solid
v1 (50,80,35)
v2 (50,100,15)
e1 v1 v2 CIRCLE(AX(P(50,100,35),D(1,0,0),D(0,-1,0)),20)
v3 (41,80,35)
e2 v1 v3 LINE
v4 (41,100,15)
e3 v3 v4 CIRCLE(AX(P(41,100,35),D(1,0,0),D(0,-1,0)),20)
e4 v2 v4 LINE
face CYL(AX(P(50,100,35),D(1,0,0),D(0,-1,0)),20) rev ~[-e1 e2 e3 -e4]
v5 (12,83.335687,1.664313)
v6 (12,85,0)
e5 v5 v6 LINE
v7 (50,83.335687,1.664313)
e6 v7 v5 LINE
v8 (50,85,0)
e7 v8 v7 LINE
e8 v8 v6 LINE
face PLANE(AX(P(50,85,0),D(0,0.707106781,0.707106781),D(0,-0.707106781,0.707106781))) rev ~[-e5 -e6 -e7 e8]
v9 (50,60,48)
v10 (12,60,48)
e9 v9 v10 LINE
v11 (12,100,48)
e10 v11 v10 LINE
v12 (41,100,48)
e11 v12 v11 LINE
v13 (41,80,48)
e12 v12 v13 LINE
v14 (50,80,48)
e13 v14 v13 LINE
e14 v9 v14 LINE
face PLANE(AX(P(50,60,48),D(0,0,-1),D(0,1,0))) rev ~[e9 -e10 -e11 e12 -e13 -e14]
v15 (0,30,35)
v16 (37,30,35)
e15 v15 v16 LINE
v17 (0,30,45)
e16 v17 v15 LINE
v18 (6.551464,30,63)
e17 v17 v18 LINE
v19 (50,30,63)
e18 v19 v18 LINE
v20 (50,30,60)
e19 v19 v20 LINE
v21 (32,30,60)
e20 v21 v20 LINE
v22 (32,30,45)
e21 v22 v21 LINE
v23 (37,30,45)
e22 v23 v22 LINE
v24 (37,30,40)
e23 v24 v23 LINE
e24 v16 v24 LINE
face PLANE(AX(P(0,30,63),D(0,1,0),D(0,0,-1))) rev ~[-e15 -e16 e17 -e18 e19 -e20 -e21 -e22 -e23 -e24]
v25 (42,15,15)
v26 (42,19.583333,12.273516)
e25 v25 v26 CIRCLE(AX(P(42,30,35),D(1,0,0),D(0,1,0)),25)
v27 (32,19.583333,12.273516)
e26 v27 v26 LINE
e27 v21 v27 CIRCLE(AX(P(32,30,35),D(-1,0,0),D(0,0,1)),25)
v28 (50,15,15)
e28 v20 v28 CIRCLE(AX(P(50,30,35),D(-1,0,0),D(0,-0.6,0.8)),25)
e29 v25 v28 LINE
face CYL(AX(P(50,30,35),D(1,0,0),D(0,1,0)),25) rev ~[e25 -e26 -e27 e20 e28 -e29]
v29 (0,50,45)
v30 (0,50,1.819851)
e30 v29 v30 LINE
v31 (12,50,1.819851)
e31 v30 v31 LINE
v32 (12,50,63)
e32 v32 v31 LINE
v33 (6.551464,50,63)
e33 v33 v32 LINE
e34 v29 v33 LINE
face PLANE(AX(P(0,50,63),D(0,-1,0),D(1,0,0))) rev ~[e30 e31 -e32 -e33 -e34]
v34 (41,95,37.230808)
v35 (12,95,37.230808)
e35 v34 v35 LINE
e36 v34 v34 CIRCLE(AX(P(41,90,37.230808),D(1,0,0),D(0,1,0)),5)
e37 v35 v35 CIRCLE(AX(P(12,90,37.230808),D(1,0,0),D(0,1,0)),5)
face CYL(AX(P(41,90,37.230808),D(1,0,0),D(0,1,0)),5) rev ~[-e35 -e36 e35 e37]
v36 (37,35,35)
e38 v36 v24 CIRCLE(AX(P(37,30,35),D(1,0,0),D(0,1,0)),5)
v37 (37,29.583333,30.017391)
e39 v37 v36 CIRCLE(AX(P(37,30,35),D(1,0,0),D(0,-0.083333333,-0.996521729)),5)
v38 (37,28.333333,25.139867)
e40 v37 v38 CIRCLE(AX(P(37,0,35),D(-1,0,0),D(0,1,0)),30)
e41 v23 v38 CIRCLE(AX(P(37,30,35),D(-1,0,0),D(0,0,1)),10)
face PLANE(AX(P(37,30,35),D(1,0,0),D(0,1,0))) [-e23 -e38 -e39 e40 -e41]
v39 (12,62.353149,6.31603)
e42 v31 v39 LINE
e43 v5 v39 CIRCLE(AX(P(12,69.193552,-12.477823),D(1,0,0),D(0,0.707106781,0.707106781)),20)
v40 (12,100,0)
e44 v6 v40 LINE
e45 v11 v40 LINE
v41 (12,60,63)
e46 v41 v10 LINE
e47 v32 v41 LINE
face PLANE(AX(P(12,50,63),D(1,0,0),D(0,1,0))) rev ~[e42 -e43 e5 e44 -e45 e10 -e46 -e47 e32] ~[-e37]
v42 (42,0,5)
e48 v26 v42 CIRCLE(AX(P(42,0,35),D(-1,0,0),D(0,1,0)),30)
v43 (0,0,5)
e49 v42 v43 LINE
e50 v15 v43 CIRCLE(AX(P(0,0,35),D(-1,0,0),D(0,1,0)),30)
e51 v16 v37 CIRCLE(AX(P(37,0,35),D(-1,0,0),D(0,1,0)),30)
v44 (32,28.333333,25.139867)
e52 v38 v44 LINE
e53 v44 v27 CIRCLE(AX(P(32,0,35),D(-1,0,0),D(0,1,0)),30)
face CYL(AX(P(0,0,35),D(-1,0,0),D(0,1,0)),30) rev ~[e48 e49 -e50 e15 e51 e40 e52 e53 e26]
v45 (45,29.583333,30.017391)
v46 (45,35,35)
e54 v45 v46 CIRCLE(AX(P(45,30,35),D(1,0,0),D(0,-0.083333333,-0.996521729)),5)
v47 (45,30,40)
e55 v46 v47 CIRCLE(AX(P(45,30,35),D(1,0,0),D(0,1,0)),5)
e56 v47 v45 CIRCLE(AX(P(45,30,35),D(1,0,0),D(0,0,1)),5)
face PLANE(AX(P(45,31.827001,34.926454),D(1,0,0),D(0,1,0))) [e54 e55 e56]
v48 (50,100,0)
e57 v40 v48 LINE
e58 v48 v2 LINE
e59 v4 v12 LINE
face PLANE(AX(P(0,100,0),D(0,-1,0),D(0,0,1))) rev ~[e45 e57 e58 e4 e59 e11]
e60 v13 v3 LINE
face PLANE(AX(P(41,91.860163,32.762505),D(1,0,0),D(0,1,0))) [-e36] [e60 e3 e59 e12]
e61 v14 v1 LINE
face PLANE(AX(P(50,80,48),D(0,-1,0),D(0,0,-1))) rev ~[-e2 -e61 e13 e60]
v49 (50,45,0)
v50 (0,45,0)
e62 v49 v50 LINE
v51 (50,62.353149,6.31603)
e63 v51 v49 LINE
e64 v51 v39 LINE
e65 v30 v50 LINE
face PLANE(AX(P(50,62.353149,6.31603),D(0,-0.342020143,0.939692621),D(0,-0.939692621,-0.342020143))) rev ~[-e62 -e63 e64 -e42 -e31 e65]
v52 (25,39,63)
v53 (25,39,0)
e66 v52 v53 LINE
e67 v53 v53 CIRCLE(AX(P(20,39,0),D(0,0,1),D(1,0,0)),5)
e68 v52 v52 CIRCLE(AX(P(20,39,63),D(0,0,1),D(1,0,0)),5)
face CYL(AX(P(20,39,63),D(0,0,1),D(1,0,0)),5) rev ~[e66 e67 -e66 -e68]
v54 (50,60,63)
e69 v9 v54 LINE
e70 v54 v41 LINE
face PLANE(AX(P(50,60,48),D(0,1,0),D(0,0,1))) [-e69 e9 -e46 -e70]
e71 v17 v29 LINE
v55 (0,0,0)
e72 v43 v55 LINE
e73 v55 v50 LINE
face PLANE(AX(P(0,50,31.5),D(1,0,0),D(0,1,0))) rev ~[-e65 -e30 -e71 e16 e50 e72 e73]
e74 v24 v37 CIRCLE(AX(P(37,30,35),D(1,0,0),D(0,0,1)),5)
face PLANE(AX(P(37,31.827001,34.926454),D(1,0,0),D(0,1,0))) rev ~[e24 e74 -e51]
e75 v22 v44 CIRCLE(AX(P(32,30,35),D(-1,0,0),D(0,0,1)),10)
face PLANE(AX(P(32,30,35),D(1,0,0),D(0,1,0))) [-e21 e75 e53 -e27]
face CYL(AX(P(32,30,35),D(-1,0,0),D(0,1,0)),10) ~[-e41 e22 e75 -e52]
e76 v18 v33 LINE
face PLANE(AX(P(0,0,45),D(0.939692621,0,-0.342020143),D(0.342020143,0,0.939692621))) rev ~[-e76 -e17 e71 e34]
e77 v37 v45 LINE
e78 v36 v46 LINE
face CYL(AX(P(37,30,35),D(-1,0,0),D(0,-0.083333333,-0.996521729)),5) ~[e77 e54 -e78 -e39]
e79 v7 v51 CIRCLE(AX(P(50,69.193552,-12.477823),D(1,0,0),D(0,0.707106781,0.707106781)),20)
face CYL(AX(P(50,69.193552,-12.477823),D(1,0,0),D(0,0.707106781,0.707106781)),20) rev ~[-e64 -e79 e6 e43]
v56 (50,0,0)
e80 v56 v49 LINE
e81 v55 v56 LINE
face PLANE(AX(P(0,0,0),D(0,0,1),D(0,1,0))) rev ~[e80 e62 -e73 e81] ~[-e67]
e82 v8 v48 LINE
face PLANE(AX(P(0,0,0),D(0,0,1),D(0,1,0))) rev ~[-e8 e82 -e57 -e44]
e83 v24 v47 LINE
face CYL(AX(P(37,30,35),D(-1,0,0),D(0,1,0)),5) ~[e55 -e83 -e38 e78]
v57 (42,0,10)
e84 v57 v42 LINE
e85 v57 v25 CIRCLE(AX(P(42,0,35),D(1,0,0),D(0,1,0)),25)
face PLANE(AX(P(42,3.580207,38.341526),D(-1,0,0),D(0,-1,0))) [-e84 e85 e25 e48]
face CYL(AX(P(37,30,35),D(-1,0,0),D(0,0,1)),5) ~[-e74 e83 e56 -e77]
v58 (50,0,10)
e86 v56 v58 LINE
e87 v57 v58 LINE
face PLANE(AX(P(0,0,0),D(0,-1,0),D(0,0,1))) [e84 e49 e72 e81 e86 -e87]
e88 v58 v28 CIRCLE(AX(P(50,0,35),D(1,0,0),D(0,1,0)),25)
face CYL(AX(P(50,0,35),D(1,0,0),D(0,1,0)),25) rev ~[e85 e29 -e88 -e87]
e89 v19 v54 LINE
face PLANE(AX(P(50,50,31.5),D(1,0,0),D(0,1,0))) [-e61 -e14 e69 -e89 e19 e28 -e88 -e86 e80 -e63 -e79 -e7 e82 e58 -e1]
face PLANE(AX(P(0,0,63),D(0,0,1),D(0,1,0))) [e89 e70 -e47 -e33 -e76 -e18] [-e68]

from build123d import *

# Parameters (mm, degrees)
F0_W      = 100
F0_H      = 63
F1_DEPTH  = 50
F3_DEPTH  = 50.001
F4_W      = 40
F4_H      = 15
F5_DEPTH  = 50.001
F7_DEPTH  = 9
F8_R      = 5
F9_DEPTH  = 41.001
F10_W     = 12
F10_H     = 10
F10_H_2   = 40
F11_DEPTH = 63.001
F13_DEPTH = 187
F15_DEPTH = 100.001
F16_R     = 25
F17_DEPTH = 18
F18_R     = 10
F19_DEPTH = 5
F22_DEPTH = 42
F20_R     = 25
F23_DEPTH = 8
F25_DEPTH = 8
F26_W     = 40
F26_H     = 9
F27_DEPTH = 8.001
F28_R     = 5
F29_DEPTH = 63.001


# Not quite as in the source:
# - an extrude ends at something that could not be found from the text; its depth is read off the source's solid


with BuildPart() as f1:
    # F0 (on Right) → F1 (new body)
    with BuildSketch(Plane.YZ):
        with Locations((50, 31.5)):
            Rectangle(F0_W, F0_H)
    extrude(amount=F1_DEPTH)

    # F2 (on face) → F3 (cut, through all)
    with BuildSketch(Plane.YZ.offset(50)):
        with BuildLine():
            Line((62.353148703, 6.3160295987), (45, 0))
            Line((45, 0), (85, 0))
            Line((85, 0), (83.3356871933, 1.6643128067))
            ThreePointArc((83.3356871933, 1.6643128067), (73.5223438483, 7.0480973254), (62.353148703, 6.3160295987))
        make_face()
    extrude(amount=-F3_DEPTH, mode=Mode.SUBTRACT)

    # F4 (on face) → F5 (cut, through all)
    with BuildSketch(Plane.YZ.offset(50)):
        with Locations((80, 55.5)):
            Rectangle(F4_W, F4_H)
    extrude(amount=-F5_DEPTH, mode=Mode.SUBTRACT)

    # F6 (on face) → F7 (cut)
    with BuildSketch(Plane.YZ.offset(50)):
        with BuildLine():
            ThreePointArc((84.8013158464, 48), (81.2386876382, 41.9291527956), (80, 35))
            ThreePointArc((80, 35), (85.8578643763, 20.8578643763), (100, 15))
            Line((100, 15), (100, 48))
            Line((100, 48), (84.8013158464, 48))
        make_face()
        with BuildLine():
            Line((80, 48), (80, 35))
            ThreePointArc((80, 35), (81.2386876382, 41.9291527956), (84.8013158464, 48))
            Line((84.8013158464, 48), (80, 48))
        make_face()
    extrude(amount=-F7_DEPTH, mode=Mode.SUBTRACT)

    # F8 (on face) → F9 (cut, through all)
    with BuildSketch(Plane.YZ.offset(41)):
        with Locations((90, 37.2308082879)):
            Circle(F8_R)
    extrude(amount=-F9_DEPTH, mode=Mode.SUBTRACT)

    # F10 (on face) → F11 (cut, through all)
    with BuildSketch(Plane.XY.offset(63)):
        with Locations((6, 55)):
            Rectangle(F10_W, F10_H)
        with Locations((6, 80)):
            Rectangle(F10_W, F10_H_2)
    extrude(amount=-F11_DEPTH, mode=Mode.SUBTRACT)

    # F12 (on face) → F13 (cut, through all)
    with BuildSketch(Plane.XZ):
        Polygon((0, 63), (0, 45), (6.5514642168, 63), align=None)
    extrude(amount=F13_DEPTH, mode=Mode.SUBTRACT)

    # F14 (on face) → F15 (cut, through all)
    with BuildSketch(Plane.XZ):
        Polygon((0, 63), (0, 45), (6.5514642168, 63), align=None)
    extrude(amount=-F15_DEPTH, mode=Mode.SUBTRACT)

    # F16 (on face) → F17 (cut)
    with BuildSketch(Plane.YZ.offset(50)):
        with Locations((30, 35)):
            Circle(F16_R)
    extrude(amount=-F17_DEPTH, mode=Mode.SUBTRACT)

    # F18 (on face) → F19 (join)
    with BuildSketch(Plane.YZ.offset(32)):
        with Locations((30, 35)):
            Circle(F18_R)
    extrude(amount=F19_DEPTH)

    # F21 (on face) → F22 (cut)
    with BuildSketch(Plane(origin=(0, 0, 0), x_dir=(0, -1, 0), z_dir=(-1, 0, 0))):
        with BuildLine():
            Line((-30, 63), (-30, 35))
            ThreePointArc((-30, 35), (21.9316580473, 14.5304524892), (-2.0665083135, 64.9287410926))
            Line((-2.0665083135, 64.9287410926), (-30, 63))
        make_face()
    extrude(amount=-F22_DEPTH, mode=Mode.SUBTRACT)

    # F20 (on face) → F23 (cut)
    with BuildSketch(Plane.YZ.offset(50)):
        with Locations((0, 35)):
            Circle(F20_R)
    extrude(amount=-F23_DEPTH, mode=Mode.SUBTRACT)

    # F24 (on face) → F25 (join)
    with BuildSketch(Plane.YZ.offset(37)):
        with BuildLine():
            ThreePointArc((29.5833333333, 30.017391357), (33.3850160019, 31.320099639), (35, 35))
            ThreePointArc((35, 35), (33.5355339059, 38.5355339059), (30, 40))
            Line((30, 40), (30, 35))
            ThreePointArc((30, 35), (29.8956518578, 32.5), (29.5833333333, 30.017391357))
        make_face()
        with BuildLine():
            Line((30, 35), (30, 40))
            ThreePointArc((30, 40), (25.0043497313, 35.2085147299), (29.5833333333, 30.017391357))
            ThreePointArc((29.5833333333, 30.017391357), (29.8956518578, 32.5), (30, 35))
        make_face()
    extrude(amount=F25_DEPTH)

    # F26 (on face) → F27 (cut, through all)
    with BuildSketch(Plane(origin=(42, 0, 0), x_dir=(0, -1, 0), z_dir=(-1, 0, 0))):
        with Locations((-10, 58.5)):
            Rectangle(F26_W, F26_H)
    extrude(amount=-F27_DEPTH, mode=Mode.SUBTRACT)

    # F28 (on face) → F29 (cut, through all)
    with BuildSketch(Plane.XY.offset(63)):
        with Locations((20, 39)):
            Circle(F28_R)
    extrude(amount=-F29_DEPTH, mode=Mode.SUBTRACT)


solid = f1.part
